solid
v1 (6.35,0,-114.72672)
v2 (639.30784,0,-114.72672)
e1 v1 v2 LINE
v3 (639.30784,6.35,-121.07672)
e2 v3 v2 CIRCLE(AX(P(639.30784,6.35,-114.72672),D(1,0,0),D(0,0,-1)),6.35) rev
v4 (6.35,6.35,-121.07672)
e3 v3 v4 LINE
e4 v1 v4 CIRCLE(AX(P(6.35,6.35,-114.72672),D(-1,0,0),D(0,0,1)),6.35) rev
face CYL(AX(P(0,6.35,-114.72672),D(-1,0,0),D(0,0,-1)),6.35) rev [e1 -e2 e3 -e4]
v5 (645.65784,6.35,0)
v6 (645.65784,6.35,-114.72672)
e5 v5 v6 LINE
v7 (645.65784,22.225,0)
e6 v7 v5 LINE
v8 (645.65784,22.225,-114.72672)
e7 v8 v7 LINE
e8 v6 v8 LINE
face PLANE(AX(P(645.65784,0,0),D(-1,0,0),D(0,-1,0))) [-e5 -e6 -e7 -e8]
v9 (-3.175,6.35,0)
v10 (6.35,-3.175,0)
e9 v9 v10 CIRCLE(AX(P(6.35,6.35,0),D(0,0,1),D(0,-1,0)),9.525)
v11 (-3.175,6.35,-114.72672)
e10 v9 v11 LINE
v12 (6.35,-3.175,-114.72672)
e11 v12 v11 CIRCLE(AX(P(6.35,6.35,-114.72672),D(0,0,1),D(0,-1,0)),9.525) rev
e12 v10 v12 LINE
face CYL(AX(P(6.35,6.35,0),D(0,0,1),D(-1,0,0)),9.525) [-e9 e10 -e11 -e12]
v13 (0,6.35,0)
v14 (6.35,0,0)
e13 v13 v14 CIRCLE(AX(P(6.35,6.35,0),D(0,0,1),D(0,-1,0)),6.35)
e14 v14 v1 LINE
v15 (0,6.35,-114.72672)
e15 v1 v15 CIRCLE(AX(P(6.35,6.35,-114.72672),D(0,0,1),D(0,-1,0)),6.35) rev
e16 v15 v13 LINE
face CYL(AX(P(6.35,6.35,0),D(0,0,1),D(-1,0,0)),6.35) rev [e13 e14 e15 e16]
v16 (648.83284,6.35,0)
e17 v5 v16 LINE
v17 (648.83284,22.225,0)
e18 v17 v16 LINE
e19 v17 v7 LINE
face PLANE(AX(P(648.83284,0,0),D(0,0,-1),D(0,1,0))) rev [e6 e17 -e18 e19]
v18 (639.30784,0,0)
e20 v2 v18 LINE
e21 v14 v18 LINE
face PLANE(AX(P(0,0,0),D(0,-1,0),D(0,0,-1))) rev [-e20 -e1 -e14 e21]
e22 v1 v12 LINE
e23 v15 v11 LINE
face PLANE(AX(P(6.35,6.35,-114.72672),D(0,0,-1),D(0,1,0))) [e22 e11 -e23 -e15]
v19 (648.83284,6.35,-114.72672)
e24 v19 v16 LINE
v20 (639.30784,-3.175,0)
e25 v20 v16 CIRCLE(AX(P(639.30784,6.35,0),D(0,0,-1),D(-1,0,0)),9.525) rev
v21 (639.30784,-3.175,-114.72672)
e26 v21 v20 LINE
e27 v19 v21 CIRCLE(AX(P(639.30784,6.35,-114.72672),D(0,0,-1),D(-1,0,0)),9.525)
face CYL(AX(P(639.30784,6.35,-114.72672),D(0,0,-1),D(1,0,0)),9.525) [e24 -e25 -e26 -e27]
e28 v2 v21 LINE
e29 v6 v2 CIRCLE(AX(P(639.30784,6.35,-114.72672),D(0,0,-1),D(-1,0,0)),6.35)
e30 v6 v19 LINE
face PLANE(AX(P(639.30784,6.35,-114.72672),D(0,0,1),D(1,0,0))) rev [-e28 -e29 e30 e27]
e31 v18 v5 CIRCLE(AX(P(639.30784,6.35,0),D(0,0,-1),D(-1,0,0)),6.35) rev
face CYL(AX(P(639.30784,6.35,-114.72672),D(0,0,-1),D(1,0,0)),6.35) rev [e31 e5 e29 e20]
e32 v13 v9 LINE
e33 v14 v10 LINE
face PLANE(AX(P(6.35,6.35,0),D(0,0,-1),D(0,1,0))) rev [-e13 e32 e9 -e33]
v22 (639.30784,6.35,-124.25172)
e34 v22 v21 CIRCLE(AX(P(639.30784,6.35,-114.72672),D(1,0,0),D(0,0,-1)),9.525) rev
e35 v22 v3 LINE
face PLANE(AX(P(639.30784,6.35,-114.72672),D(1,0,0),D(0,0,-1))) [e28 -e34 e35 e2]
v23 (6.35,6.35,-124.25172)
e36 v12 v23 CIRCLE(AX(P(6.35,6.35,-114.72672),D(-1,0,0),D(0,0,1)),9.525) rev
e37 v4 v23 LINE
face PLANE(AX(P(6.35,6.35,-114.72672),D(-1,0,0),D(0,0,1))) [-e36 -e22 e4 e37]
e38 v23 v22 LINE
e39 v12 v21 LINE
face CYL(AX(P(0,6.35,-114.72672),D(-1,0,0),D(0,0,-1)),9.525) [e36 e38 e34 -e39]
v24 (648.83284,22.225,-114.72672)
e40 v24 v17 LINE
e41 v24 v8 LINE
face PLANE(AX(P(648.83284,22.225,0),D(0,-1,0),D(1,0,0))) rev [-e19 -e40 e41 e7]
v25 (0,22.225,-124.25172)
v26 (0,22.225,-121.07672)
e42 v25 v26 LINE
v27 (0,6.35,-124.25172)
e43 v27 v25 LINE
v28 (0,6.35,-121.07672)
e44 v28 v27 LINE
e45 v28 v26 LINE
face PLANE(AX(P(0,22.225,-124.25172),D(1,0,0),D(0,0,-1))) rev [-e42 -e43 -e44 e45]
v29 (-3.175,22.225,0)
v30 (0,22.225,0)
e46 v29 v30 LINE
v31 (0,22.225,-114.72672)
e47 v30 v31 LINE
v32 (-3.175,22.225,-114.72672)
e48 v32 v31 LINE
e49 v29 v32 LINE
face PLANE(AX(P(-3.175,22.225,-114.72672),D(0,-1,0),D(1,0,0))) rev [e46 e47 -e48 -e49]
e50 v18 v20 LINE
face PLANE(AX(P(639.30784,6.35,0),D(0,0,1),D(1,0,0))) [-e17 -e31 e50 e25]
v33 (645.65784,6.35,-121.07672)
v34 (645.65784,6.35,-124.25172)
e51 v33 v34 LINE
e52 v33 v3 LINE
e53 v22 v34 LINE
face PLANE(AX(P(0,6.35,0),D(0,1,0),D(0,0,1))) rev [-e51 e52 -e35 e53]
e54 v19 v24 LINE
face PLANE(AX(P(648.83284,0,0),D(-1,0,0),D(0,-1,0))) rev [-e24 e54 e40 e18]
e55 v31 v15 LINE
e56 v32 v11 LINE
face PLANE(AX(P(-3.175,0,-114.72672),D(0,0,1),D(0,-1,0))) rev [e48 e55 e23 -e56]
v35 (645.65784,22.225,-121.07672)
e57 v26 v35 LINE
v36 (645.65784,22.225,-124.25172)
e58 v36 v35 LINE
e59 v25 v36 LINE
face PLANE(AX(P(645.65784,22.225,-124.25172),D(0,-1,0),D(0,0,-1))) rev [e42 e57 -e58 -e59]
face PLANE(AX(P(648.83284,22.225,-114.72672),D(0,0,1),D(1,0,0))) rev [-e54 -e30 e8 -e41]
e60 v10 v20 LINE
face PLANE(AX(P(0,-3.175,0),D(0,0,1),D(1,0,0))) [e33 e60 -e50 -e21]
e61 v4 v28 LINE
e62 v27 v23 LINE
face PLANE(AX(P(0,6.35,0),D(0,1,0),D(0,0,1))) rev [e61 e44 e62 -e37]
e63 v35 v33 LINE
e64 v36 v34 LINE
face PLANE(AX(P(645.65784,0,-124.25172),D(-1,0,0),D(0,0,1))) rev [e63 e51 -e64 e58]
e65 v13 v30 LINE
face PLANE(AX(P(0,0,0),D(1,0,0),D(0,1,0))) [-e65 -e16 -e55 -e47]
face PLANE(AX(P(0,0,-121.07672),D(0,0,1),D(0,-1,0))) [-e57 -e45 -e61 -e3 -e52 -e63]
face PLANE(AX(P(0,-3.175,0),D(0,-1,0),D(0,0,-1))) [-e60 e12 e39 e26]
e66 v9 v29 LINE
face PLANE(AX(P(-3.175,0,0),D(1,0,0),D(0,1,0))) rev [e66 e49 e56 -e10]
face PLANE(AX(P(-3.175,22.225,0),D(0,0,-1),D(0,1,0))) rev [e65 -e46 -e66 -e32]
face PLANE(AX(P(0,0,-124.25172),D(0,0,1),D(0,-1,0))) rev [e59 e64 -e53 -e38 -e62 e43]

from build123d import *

# Parameters (mm, degrees)
SKETCH1_W                    = 645.65784
SKETCH1_H                    = 121.07672
BASE_FLANGE1_DEPTH           = 3.175
EDGE_FLANGE1_STRIP_W         = 25.4
EDGE_FLANGE1_STRIP_H         = 3.175
EDGE_FLANGE1_STRIP_CUT_DEPTH = 645.65784
EDGE_FLANGE1_DEPTH           = 645.65784
EDGE_FLANGE2_START           = -124.25172
EDGE_FLANGE2_DEPTH           = 124.25172
EDGE_FLANGE2_2_DEPTH         = 9.525
EDGE_FLANGE2_START_2         = -114.72672
EDGE_FLANGE2_3_DEPTH         = 114.72672


# Read off the part's stored shape, not the designer's step: Edge-Flange2
# Sheet-metal steps are written as plain solids
with BuildPart() as part:
    # Sketch1 → Base-Flange1 (new body)
    with BuildSketch(Plane(origin=(0, 0, 0), x_dir=(1, 0, 0), z_dir=(0, 1, 0))):
        with Locations((322.82892, 60.53836)):
            Rectangle(SKETCH1_W, SKETCH1_H)
    extrude(amount=-BASE_FLANGE1_DEPTH)

    # Edge-Flange1 strip (across the edge) → Edge-Flange1 strip cut (cut)
    with BuildSketch(Plane(origin=(645.65784, 0, -121.07672), x_dir=(0, 0, 1), z_dir=(-1, 0, 0))):
        with Locations((-6.35, -1.5875)):
            Rectangle(EDGE_FLANGE1_STRIP_W, EDGE_FLANGE1_STRIP_H)
    extrude(amount=EDGE_FLANGE1_STRIP_CUT_DEPTH, mode=Mode.SUBTRACT)

    # Edge-Flange1 section (across the edge) → Edge-Flange1 (add)
    with BuildSketch(Plane(origin=(645.65784, 0, -121.07672), x_dir=(0, 0, 1), z_dir=(-1, 0, 0))):
        with BuildLine():
            Line((-3.175, 6.35), (-3.175, 22.225))
            Line((-3.175, 22.225), (0, 22.225))
            Line((0, 22.225), (0, 6.35))
            ThreePointArc((0, 6.35), (1.859871939, 1.859871939), (6.35, 0))
            Line((6.35, 0), (6.35, -3.175))
            ThreePointArc((6.35, -3.175), (-0.385192091, -0.385192091), (-3.175, 6.35))
        make_face()
    extrude(amount=EDGE_FLANGE1_DEPTH)

    # Edge-Flange2 outline → Edge-Flange2 (cut)
    with BuildSketch(Plane.XY.offset(EDGE_FLANGE2_START)):
        with BuildLine():
            ThreePointArc((639.30784, 0), (643.797968061, 1.859871939), (645.65784, 6.35))
            Line((645.65784, 6.35), (639.30784, 6.35))
            Line((639.30784, 6.35), (639.30784, 0))
        make_face()
        with BuildLine():
            ThreePointArc((645.65784, -0.749515829), (642.706570405, -2.547991719), (639.30784, -3.175))
            Line((639.30784, -3.175), (645.65784, -3.175))
            Line((645.65784, -3.175), (645.65784, -0.749515829))
        make_face()
        with BuildLine():
            ThreePointArc((0, 6.35), (1.859871939, 1.859871939), (6.35, 0))
            Line((6.35, 0), (6.35, 6.35))
            Line((6.35, 6.35), (0, 6.35))
        make_face()
        with BuildLine():
            Line((0, -3.175), (6.35, -3.175))
            ThreePointArc((6.35, -3.175), (2.951269595, -2.547991719), (0, -0.749515829))
            Line((0, -0.749515829), (0, -3.175))
        make_face()
    extrude(amount=EDGE_FLANGE2_DEPTH, mode=Mode.SUBTRACT)

    # Edge-Flange2 2 outline → Edge-Flange2 2 (cut)
    with BuildSketch(Plane.XY.offset(EDGE_FLANGE2_START)):
        with BuildLine():
            ThreePointArc((645.65784, 6.35), (643.797968061, 1.859871939), (639.30784, 0))
            Line((639.30784, 0), (639.30784, -3.175))
            ThreePointArc((639.30784, -3.175), (642.706570405, -2.547991719), (645.65784, -0.749515829))
            Line((645.65784, -0.749515829), (645.65784, 6.35))
        make_face()
        with BuildLine():
            Line((0, 6.35), (0, -0.749515829))
            ThreePointArc((0, -0.749515829), (2.951269595, -2.547991719), (6.35, -3.175))
            Line((6.35, -3.175), (6.35, 0))
            ThreePointArc((6.35, 0), (1.859871939, 1.859871939), (0, 6.35))
        make_face()
    extrude(amount=EDGE_FLANGE2_2_DEPTH, mode=Mode.SUBTRACT)

    # Edge-Flange2 3 outline → Edge-Flange2 3 (add)
    with BuildSketch(Plane.XY.offset(EDGE_FLANGE2_START_2)):
        with BuildLine():
            Line((639.30784, 0), (645.65784, 0))
            Line((645.65784, 0), (645.65784, -0.749515829))
            ThreePointArc((645.65784, -0.749515829), (648.002935601, 2.461435033), (648.83284, 6.35))
            Line((648.83284, 6.35), (648.83284, 22.225))
            Line((648.83284, 22.225), (645.65784, 22.225))
            Line((645.65784, 22.225), (645.65784, 6.35))
            ThreePointArc((645.65784, 6.35), (643.797968061, 1.859871939), (639.30784, 0))
        make_face()
        with BuildLine():
            Line((0, 0), (6.35, 0))
            ThreePointArc((6.35, 0), (1.859871939, 1.859871939), (0, 6.35))
            Line((0, 6.35), (0, 22.225))
            Line((0, 22.225), (-3.175, 22.225))
            Line((-3.175, 22.225), (-3.175, 6.35))
            ThreePointArc((-3.175, 6.35), (-2.345095601, 2.461435033), (0, -0.749515829))
            Line((0, -0.749515829), (0, 0))
        make_face()
    extrude(amount=EDGE_FLANGE2_3_DEPTH)


solid = part.part
